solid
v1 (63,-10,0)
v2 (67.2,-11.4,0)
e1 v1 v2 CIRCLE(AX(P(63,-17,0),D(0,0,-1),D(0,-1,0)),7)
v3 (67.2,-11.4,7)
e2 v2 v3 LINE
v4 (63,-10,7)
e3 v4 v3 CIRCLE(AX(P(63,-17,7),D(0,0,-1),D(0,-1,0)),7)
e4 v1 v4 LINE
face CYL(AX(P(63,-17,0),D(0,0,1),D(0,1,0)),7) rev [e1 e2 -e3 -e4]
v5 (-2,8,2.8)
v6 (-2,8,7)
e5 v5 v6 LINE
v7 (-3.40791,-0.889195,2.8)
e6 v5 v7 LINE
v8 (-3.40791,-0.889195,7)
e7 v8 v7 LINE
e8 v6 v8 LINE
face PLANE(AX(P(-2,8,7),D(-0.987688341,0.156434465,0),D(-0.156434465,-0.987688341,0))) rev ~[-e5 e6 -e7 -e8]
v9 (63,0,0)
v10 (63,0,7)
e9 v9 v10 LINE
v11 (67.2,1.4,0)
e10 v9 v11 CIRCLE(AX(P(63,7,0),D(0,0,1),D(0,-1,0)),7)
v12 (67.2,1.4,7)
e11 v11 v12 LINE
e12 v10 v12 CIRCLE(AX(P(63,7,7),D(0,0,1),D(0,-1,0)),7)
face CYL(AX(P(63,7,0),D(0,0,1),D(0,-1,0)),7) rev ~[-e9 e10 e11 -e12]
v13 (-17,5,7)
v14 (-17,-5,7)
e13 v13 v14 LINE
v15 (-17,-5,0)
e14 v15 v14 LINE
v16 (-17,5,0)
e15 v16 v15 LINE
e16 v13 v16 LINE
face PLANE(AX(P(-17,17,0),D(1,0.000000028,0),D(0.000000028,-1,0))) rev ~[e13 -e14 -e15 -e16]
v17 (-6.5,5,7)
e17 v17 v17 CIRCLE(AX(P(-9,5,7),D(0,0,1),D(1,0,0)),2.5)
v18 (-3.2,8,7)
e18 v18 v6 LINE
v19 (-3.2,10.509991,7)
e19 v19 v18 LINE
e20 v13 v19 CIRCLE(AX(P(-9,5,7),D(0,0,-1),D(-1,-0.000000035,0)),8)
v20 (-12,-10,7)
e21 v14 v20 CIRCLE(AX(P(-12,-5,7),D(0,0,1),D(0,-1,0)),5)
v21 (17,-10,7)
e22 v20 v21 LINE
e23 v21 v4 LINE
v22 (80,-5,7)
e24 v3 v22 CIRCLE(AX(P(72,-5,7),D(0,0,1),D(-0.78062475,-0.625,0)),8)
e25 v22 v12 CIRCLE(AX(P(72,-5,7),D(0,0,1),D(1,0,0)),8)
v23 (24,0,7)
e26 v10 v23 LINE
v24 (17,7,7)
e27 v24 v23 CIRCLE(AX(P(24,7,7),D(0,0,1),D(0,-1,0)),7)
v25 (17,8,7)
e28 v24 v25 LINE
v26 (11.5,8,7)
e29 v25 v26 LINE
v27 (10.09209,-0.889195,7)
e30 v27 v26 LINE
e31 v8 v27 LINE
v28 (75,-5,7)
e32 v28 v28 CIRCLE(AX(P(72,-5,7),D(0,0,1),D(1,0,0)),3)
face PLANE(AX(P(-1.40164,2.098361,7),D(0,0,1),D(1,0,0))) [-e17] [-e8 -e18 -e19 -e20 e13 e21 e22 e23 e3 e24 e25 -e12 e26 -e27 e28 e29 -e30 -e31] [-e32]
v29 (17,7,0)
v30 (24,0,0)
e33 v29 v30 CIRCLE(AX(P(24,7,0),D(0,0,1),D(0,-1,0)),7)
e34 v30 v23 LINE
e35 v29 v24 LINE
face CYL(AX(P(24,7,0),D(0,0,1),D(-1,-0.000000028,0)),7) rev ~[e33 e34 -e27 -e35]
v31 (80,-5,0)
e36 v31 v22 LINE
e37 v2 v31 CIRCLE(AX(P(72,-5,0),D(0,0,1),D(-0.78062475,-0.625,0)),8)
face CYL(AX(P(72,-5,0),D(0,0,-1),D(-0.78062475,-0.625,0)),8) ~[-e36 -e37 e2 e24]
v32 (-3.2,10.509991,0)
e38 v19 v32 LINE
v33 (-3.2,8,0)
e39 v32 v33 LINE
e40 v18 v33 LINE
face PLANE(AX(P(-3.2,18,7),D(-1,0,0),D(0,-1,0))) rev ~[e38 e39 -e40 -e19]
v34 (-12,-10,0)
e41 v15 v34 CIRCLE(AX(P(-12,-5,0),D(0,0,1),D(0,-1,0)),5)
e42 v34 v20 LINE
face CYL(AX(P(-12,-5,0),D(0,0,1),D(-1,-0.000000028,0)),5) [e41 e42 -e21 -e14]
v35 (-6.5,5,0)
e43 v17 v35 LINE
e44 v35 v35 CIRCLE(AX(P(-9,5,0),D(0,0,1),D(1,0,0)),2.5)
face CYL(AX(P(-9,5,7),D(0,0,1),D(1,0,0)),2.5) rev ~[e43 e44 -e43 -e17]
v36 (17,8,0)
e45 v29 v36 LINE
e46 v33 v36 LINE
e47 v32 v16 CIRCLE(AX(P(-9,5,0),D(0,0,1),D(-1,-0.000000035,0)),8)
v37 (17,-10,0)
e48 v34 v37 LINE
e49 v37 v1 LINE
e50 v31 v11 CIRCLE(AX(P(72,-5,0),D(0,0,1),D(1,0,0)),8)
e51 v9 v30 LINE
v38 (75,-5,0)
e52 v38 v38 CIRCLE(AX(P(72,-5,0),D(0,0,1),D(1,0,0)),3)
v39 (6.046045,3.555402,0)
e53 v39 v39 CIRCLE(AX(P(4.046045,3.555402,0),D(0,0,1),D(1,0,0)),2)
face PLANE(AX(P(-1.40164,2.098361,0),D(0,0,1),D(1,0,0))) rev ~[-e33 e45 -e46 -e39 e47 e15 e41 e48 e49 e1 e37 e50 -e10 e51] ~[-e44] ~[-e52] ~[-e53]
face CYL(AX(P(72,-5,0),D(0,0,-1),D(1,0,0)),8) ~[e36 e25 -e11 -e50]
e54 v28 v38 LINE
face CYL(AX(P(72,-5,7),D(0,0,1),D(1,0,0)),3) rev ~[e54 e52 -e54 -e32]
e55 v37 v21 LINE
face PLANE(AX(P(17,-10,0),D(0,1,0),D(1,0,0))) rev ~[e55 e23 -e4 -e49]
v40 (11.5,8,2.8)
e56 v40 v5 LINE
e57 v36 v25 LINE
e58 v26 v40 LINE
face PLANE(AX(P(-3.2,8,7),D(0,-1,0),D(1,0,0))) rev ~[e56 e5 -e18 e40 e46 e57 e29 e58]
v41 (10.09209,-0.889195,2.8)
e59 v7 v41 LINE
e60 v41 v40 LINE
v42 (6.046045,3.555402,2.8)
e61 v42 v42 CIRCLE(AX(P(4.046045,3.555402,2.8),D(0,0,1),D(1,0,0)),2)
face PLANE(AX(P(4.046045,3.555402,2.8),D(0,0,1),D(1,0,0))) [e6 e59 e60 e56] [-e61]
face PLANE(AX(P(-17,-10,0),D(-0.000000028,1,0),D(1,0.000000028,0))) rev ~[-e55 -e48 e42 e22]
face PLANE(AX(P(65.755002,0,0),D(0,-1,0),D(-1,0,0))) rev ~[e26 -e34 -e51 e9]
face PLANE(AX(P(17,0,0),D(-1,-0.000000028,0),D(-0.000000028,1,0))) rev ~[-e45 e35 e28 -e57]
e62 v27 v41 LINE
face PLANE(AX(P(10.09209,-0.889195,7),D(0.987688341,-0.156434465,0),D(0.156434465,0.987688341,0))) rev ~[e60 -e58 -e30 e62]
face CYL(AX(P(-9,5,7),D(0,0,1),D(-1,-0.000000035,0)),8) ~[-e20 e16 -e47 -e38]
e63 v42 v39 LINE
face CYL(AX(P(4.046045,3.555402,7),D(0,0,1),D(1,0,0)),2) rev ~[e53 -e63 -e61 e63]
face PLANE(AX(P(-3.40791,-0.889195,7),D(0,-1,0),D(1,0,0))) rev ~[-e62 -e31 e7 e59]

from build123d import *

# Parameters (mm, degrees)
F1_DEPTH    = 7
F2_R        = 2
F3_DEPTH    = 4.2
F4_DEPTH    = 25
F5_R        = 2.5
F6_DEPTH    = 25
F7_R        = 8
F8_R        = 5
F9_T1_DEPTH = 52
F11_DEPTH   = 25
F13_DEPTH   = 25
F14_R       = 3
F15_DEPTH   = 25
F16_R       = 7


# Not quite as in the source:
# - a fillet or chamfer that OpenCascade refuses, or shapes differently, is made with other operations: its cross-section is extruded or revolved along the edge and cut away or added
# - ends of sketch curves that miss each other by under 0.0002 mm in the source are joined
# - a feature names something its author has since deleted; it is built from what else it names


with BuildPart() as f1:
    # F0 (on Top) → F1 (new body)
    with BuildSketch(Plane.XY):
        Polygon((-2, 17), (-17.0000004771, 17), (-16.9999997194, -10.0000004771), (17.0000002806, -9.9999995229), (17, 4.771e-07), (16.9999997755, 8), (-2, 8), align=None)
        with BuildLine():
            Line((17, 4.771e-07), (17.0000002806, -9.9999995229))
            Line((17.0000002806, -9.9999995229), (65.7550022822, -9.9999995229))
            ThreePointArc((65.7550022822, -9.9999995229), (64.0000002806, -4.9999995229), (65.7550022822, 4.771e-07))
            Line((65.7550022822, 4.771e-07), (17, 4.771e-07))
        make_face()
        with BuildLine():
            ThreePointArc((65.7550022822, 4.771e-07), (64.0000002806, -4.9999995229), (65.7550022822, -9.9999995229))
            Line((65.7550022822, -9.9999995229), (72.0000002806, -9.9999995229))
            Line((72.0000002806, -9.9999995229), (72.0000002806, 4.771e-07))
            Line((72.0000002806, 4.771e-07), (65.7550022822, 4.771e-07))
        make_face()
        with BuildLine():
            Line((72.0000002806, -9.9999995229), (65.7550022822, -9.9999995229))
            ThreePointArc((65.7550022822, -9.9999995229), (74.6495300514, -12.5485087793), (80.0000002806, -4.9999995229))
            ThreePointArc((80.0000002806, -4.9999995229), (74.6495300514, 2.5485097334), (65.7550022822, 4.771e-07))
            Line((65.7550022822, 4.771e-07), (72.0000002806, 4.771e-07))
            Line((72.0000002806, 4.771e-07), (72.0000002806, -9.9999995229))
        make_face()
    extrude(amount=F1_DEPTH)

    # F2 (on face) → F3 (cut)
    with BuildSketch(Plane.XY.offset(7)):
        Polygon((11.5, 8), (-2, 8), (-3.4079101854, -0.8891950654), (10.0920898146, -0.8891950654), align=None)
        with Locations((4.0460449073, 3.5554024673)):
            Circle(F2_R, mode=Mode.SUBTRACT)
    extrude(amount=-F3_DEPTH, mode=Mode.SUBTRACT)

    # F4 (cut): a face of the model
    f4_faces = [f1.faces().sort_by_distance(p)[0] for p in [
        (4.0460449073, 3.5554024673, 7),
    ]]
    extrude(f4_faces, amount=-F4_DEPTH, mode=Mode.SUBTRACT)

    # F5 (on face) → F6 (cut)
    with BuildSketch(Plane.XY.offset(7)):
        with Locations((-9, 5)):
            Circle(F5_R)
    extrude(amount=-F6_DEPTH, mode=Mode.SUBTRACT)

    # F7
    f7_edges = [f1.edges().sort_by_distance(p)[0] for p in [
        (-17, 17, 3.5),
    ]]
    fillet(f7_edges, radius=F7_R)

    # F8
    f8_edges = [f1.edges().sort_by_distance(p)[0] for p in [
        (-17, -10, 3.5),
    ]]
    fillet(f8_edges, radius=F8_R)

    # F9: fillet of radius 9 on 1 edges, made by hand

    # F9_s2 → F9_t1 (cut)
    with BuildSketch(Plane.XY.offset(-22.5)):
        with BuildLine():
            ThreePointArc((-11, 17), (-4.6360389693, 14.3639610307), (-2, 8))
            Line((-2, 8), (-2, 17))
            Line((-2, 17), (-11, 17))
        make_face()
    extrude(amount=F9_T1_DEPTH, mode=Mode.SUBTRACT)

    # F10 (on face) → F11 (cut)
    with BuildSketch(Plane.XY.offset(7)):
        with BuildLine():
            ThreePointArc((-3.2, 12.4899888642), (-2.3051739523, 10.3237900078), (-2, 8))
            Line((-2, 8), (-2, 18))
            Line((-2, 18), (-3.2, 18))
            Line((-3.2, 18), (-3.2, 12.4899888642))
        make_face()
        with BuildLine():
            Line((-3.2, 8), (-2, 8))
            ThreePointArc((-2, 8), (-2.3051739523, 10.3237900078), (-3.2, 12.4899888642))
            Line((-3.2, 12.4899888642), (-3.2, 8))
        make_face()
    extrude(amount=-F11_DEPTH, mode=Mode.SUBTRACT)

    # F12 (on face) → F13 (cut)
    with BuildSketch(Plane.XY.offset(7)):
        with BuildLine():
            ThreePointArc((-17, 4.9999997208), (-11.9664795245, 12.4296701966), (-3.2, 10.5099909256))
            Line((-3.2, 10.5099909256), (-3.2, 12.4899888642))
            ThreePointArc((-3.2, 12.4899888642), (-6.0560248177, 15.5204460903), (-9.9704600393, 16.9409198335))
            ThreePointArc((-9.9704600393, 16.9409198335), (-14.9901454961, 14.3026559347), (-17.0000002526, 8.9999997755))
            Line((-17.0000002526, 8.9999997755), (-17, 4.9999997208))
        make_face()
    extrude(amount=-F13_DEPTH, mode=Mode.SUBTRACT)

    # F14 (on face) → F15 (cut)
    with BuildSketch(Plane.XY.offset(7)):
        with Locations((72.0000002806, -4.9999995229)):
            Circle(F14_R)
    extrude(amount=-F15_DEPTH, mode=Mode.SUBTRACT)

    # F16
    f16_edges = [f1.edges().sort_by_distance(p)[0] for p in [
        (17, 0, 3.5),
        (65.755002, -10, 3.5),
        (65.755002, 0, 3.5),
    ]]
    fillet(f16_edges, radius=F16_R)


solid = f1.part
